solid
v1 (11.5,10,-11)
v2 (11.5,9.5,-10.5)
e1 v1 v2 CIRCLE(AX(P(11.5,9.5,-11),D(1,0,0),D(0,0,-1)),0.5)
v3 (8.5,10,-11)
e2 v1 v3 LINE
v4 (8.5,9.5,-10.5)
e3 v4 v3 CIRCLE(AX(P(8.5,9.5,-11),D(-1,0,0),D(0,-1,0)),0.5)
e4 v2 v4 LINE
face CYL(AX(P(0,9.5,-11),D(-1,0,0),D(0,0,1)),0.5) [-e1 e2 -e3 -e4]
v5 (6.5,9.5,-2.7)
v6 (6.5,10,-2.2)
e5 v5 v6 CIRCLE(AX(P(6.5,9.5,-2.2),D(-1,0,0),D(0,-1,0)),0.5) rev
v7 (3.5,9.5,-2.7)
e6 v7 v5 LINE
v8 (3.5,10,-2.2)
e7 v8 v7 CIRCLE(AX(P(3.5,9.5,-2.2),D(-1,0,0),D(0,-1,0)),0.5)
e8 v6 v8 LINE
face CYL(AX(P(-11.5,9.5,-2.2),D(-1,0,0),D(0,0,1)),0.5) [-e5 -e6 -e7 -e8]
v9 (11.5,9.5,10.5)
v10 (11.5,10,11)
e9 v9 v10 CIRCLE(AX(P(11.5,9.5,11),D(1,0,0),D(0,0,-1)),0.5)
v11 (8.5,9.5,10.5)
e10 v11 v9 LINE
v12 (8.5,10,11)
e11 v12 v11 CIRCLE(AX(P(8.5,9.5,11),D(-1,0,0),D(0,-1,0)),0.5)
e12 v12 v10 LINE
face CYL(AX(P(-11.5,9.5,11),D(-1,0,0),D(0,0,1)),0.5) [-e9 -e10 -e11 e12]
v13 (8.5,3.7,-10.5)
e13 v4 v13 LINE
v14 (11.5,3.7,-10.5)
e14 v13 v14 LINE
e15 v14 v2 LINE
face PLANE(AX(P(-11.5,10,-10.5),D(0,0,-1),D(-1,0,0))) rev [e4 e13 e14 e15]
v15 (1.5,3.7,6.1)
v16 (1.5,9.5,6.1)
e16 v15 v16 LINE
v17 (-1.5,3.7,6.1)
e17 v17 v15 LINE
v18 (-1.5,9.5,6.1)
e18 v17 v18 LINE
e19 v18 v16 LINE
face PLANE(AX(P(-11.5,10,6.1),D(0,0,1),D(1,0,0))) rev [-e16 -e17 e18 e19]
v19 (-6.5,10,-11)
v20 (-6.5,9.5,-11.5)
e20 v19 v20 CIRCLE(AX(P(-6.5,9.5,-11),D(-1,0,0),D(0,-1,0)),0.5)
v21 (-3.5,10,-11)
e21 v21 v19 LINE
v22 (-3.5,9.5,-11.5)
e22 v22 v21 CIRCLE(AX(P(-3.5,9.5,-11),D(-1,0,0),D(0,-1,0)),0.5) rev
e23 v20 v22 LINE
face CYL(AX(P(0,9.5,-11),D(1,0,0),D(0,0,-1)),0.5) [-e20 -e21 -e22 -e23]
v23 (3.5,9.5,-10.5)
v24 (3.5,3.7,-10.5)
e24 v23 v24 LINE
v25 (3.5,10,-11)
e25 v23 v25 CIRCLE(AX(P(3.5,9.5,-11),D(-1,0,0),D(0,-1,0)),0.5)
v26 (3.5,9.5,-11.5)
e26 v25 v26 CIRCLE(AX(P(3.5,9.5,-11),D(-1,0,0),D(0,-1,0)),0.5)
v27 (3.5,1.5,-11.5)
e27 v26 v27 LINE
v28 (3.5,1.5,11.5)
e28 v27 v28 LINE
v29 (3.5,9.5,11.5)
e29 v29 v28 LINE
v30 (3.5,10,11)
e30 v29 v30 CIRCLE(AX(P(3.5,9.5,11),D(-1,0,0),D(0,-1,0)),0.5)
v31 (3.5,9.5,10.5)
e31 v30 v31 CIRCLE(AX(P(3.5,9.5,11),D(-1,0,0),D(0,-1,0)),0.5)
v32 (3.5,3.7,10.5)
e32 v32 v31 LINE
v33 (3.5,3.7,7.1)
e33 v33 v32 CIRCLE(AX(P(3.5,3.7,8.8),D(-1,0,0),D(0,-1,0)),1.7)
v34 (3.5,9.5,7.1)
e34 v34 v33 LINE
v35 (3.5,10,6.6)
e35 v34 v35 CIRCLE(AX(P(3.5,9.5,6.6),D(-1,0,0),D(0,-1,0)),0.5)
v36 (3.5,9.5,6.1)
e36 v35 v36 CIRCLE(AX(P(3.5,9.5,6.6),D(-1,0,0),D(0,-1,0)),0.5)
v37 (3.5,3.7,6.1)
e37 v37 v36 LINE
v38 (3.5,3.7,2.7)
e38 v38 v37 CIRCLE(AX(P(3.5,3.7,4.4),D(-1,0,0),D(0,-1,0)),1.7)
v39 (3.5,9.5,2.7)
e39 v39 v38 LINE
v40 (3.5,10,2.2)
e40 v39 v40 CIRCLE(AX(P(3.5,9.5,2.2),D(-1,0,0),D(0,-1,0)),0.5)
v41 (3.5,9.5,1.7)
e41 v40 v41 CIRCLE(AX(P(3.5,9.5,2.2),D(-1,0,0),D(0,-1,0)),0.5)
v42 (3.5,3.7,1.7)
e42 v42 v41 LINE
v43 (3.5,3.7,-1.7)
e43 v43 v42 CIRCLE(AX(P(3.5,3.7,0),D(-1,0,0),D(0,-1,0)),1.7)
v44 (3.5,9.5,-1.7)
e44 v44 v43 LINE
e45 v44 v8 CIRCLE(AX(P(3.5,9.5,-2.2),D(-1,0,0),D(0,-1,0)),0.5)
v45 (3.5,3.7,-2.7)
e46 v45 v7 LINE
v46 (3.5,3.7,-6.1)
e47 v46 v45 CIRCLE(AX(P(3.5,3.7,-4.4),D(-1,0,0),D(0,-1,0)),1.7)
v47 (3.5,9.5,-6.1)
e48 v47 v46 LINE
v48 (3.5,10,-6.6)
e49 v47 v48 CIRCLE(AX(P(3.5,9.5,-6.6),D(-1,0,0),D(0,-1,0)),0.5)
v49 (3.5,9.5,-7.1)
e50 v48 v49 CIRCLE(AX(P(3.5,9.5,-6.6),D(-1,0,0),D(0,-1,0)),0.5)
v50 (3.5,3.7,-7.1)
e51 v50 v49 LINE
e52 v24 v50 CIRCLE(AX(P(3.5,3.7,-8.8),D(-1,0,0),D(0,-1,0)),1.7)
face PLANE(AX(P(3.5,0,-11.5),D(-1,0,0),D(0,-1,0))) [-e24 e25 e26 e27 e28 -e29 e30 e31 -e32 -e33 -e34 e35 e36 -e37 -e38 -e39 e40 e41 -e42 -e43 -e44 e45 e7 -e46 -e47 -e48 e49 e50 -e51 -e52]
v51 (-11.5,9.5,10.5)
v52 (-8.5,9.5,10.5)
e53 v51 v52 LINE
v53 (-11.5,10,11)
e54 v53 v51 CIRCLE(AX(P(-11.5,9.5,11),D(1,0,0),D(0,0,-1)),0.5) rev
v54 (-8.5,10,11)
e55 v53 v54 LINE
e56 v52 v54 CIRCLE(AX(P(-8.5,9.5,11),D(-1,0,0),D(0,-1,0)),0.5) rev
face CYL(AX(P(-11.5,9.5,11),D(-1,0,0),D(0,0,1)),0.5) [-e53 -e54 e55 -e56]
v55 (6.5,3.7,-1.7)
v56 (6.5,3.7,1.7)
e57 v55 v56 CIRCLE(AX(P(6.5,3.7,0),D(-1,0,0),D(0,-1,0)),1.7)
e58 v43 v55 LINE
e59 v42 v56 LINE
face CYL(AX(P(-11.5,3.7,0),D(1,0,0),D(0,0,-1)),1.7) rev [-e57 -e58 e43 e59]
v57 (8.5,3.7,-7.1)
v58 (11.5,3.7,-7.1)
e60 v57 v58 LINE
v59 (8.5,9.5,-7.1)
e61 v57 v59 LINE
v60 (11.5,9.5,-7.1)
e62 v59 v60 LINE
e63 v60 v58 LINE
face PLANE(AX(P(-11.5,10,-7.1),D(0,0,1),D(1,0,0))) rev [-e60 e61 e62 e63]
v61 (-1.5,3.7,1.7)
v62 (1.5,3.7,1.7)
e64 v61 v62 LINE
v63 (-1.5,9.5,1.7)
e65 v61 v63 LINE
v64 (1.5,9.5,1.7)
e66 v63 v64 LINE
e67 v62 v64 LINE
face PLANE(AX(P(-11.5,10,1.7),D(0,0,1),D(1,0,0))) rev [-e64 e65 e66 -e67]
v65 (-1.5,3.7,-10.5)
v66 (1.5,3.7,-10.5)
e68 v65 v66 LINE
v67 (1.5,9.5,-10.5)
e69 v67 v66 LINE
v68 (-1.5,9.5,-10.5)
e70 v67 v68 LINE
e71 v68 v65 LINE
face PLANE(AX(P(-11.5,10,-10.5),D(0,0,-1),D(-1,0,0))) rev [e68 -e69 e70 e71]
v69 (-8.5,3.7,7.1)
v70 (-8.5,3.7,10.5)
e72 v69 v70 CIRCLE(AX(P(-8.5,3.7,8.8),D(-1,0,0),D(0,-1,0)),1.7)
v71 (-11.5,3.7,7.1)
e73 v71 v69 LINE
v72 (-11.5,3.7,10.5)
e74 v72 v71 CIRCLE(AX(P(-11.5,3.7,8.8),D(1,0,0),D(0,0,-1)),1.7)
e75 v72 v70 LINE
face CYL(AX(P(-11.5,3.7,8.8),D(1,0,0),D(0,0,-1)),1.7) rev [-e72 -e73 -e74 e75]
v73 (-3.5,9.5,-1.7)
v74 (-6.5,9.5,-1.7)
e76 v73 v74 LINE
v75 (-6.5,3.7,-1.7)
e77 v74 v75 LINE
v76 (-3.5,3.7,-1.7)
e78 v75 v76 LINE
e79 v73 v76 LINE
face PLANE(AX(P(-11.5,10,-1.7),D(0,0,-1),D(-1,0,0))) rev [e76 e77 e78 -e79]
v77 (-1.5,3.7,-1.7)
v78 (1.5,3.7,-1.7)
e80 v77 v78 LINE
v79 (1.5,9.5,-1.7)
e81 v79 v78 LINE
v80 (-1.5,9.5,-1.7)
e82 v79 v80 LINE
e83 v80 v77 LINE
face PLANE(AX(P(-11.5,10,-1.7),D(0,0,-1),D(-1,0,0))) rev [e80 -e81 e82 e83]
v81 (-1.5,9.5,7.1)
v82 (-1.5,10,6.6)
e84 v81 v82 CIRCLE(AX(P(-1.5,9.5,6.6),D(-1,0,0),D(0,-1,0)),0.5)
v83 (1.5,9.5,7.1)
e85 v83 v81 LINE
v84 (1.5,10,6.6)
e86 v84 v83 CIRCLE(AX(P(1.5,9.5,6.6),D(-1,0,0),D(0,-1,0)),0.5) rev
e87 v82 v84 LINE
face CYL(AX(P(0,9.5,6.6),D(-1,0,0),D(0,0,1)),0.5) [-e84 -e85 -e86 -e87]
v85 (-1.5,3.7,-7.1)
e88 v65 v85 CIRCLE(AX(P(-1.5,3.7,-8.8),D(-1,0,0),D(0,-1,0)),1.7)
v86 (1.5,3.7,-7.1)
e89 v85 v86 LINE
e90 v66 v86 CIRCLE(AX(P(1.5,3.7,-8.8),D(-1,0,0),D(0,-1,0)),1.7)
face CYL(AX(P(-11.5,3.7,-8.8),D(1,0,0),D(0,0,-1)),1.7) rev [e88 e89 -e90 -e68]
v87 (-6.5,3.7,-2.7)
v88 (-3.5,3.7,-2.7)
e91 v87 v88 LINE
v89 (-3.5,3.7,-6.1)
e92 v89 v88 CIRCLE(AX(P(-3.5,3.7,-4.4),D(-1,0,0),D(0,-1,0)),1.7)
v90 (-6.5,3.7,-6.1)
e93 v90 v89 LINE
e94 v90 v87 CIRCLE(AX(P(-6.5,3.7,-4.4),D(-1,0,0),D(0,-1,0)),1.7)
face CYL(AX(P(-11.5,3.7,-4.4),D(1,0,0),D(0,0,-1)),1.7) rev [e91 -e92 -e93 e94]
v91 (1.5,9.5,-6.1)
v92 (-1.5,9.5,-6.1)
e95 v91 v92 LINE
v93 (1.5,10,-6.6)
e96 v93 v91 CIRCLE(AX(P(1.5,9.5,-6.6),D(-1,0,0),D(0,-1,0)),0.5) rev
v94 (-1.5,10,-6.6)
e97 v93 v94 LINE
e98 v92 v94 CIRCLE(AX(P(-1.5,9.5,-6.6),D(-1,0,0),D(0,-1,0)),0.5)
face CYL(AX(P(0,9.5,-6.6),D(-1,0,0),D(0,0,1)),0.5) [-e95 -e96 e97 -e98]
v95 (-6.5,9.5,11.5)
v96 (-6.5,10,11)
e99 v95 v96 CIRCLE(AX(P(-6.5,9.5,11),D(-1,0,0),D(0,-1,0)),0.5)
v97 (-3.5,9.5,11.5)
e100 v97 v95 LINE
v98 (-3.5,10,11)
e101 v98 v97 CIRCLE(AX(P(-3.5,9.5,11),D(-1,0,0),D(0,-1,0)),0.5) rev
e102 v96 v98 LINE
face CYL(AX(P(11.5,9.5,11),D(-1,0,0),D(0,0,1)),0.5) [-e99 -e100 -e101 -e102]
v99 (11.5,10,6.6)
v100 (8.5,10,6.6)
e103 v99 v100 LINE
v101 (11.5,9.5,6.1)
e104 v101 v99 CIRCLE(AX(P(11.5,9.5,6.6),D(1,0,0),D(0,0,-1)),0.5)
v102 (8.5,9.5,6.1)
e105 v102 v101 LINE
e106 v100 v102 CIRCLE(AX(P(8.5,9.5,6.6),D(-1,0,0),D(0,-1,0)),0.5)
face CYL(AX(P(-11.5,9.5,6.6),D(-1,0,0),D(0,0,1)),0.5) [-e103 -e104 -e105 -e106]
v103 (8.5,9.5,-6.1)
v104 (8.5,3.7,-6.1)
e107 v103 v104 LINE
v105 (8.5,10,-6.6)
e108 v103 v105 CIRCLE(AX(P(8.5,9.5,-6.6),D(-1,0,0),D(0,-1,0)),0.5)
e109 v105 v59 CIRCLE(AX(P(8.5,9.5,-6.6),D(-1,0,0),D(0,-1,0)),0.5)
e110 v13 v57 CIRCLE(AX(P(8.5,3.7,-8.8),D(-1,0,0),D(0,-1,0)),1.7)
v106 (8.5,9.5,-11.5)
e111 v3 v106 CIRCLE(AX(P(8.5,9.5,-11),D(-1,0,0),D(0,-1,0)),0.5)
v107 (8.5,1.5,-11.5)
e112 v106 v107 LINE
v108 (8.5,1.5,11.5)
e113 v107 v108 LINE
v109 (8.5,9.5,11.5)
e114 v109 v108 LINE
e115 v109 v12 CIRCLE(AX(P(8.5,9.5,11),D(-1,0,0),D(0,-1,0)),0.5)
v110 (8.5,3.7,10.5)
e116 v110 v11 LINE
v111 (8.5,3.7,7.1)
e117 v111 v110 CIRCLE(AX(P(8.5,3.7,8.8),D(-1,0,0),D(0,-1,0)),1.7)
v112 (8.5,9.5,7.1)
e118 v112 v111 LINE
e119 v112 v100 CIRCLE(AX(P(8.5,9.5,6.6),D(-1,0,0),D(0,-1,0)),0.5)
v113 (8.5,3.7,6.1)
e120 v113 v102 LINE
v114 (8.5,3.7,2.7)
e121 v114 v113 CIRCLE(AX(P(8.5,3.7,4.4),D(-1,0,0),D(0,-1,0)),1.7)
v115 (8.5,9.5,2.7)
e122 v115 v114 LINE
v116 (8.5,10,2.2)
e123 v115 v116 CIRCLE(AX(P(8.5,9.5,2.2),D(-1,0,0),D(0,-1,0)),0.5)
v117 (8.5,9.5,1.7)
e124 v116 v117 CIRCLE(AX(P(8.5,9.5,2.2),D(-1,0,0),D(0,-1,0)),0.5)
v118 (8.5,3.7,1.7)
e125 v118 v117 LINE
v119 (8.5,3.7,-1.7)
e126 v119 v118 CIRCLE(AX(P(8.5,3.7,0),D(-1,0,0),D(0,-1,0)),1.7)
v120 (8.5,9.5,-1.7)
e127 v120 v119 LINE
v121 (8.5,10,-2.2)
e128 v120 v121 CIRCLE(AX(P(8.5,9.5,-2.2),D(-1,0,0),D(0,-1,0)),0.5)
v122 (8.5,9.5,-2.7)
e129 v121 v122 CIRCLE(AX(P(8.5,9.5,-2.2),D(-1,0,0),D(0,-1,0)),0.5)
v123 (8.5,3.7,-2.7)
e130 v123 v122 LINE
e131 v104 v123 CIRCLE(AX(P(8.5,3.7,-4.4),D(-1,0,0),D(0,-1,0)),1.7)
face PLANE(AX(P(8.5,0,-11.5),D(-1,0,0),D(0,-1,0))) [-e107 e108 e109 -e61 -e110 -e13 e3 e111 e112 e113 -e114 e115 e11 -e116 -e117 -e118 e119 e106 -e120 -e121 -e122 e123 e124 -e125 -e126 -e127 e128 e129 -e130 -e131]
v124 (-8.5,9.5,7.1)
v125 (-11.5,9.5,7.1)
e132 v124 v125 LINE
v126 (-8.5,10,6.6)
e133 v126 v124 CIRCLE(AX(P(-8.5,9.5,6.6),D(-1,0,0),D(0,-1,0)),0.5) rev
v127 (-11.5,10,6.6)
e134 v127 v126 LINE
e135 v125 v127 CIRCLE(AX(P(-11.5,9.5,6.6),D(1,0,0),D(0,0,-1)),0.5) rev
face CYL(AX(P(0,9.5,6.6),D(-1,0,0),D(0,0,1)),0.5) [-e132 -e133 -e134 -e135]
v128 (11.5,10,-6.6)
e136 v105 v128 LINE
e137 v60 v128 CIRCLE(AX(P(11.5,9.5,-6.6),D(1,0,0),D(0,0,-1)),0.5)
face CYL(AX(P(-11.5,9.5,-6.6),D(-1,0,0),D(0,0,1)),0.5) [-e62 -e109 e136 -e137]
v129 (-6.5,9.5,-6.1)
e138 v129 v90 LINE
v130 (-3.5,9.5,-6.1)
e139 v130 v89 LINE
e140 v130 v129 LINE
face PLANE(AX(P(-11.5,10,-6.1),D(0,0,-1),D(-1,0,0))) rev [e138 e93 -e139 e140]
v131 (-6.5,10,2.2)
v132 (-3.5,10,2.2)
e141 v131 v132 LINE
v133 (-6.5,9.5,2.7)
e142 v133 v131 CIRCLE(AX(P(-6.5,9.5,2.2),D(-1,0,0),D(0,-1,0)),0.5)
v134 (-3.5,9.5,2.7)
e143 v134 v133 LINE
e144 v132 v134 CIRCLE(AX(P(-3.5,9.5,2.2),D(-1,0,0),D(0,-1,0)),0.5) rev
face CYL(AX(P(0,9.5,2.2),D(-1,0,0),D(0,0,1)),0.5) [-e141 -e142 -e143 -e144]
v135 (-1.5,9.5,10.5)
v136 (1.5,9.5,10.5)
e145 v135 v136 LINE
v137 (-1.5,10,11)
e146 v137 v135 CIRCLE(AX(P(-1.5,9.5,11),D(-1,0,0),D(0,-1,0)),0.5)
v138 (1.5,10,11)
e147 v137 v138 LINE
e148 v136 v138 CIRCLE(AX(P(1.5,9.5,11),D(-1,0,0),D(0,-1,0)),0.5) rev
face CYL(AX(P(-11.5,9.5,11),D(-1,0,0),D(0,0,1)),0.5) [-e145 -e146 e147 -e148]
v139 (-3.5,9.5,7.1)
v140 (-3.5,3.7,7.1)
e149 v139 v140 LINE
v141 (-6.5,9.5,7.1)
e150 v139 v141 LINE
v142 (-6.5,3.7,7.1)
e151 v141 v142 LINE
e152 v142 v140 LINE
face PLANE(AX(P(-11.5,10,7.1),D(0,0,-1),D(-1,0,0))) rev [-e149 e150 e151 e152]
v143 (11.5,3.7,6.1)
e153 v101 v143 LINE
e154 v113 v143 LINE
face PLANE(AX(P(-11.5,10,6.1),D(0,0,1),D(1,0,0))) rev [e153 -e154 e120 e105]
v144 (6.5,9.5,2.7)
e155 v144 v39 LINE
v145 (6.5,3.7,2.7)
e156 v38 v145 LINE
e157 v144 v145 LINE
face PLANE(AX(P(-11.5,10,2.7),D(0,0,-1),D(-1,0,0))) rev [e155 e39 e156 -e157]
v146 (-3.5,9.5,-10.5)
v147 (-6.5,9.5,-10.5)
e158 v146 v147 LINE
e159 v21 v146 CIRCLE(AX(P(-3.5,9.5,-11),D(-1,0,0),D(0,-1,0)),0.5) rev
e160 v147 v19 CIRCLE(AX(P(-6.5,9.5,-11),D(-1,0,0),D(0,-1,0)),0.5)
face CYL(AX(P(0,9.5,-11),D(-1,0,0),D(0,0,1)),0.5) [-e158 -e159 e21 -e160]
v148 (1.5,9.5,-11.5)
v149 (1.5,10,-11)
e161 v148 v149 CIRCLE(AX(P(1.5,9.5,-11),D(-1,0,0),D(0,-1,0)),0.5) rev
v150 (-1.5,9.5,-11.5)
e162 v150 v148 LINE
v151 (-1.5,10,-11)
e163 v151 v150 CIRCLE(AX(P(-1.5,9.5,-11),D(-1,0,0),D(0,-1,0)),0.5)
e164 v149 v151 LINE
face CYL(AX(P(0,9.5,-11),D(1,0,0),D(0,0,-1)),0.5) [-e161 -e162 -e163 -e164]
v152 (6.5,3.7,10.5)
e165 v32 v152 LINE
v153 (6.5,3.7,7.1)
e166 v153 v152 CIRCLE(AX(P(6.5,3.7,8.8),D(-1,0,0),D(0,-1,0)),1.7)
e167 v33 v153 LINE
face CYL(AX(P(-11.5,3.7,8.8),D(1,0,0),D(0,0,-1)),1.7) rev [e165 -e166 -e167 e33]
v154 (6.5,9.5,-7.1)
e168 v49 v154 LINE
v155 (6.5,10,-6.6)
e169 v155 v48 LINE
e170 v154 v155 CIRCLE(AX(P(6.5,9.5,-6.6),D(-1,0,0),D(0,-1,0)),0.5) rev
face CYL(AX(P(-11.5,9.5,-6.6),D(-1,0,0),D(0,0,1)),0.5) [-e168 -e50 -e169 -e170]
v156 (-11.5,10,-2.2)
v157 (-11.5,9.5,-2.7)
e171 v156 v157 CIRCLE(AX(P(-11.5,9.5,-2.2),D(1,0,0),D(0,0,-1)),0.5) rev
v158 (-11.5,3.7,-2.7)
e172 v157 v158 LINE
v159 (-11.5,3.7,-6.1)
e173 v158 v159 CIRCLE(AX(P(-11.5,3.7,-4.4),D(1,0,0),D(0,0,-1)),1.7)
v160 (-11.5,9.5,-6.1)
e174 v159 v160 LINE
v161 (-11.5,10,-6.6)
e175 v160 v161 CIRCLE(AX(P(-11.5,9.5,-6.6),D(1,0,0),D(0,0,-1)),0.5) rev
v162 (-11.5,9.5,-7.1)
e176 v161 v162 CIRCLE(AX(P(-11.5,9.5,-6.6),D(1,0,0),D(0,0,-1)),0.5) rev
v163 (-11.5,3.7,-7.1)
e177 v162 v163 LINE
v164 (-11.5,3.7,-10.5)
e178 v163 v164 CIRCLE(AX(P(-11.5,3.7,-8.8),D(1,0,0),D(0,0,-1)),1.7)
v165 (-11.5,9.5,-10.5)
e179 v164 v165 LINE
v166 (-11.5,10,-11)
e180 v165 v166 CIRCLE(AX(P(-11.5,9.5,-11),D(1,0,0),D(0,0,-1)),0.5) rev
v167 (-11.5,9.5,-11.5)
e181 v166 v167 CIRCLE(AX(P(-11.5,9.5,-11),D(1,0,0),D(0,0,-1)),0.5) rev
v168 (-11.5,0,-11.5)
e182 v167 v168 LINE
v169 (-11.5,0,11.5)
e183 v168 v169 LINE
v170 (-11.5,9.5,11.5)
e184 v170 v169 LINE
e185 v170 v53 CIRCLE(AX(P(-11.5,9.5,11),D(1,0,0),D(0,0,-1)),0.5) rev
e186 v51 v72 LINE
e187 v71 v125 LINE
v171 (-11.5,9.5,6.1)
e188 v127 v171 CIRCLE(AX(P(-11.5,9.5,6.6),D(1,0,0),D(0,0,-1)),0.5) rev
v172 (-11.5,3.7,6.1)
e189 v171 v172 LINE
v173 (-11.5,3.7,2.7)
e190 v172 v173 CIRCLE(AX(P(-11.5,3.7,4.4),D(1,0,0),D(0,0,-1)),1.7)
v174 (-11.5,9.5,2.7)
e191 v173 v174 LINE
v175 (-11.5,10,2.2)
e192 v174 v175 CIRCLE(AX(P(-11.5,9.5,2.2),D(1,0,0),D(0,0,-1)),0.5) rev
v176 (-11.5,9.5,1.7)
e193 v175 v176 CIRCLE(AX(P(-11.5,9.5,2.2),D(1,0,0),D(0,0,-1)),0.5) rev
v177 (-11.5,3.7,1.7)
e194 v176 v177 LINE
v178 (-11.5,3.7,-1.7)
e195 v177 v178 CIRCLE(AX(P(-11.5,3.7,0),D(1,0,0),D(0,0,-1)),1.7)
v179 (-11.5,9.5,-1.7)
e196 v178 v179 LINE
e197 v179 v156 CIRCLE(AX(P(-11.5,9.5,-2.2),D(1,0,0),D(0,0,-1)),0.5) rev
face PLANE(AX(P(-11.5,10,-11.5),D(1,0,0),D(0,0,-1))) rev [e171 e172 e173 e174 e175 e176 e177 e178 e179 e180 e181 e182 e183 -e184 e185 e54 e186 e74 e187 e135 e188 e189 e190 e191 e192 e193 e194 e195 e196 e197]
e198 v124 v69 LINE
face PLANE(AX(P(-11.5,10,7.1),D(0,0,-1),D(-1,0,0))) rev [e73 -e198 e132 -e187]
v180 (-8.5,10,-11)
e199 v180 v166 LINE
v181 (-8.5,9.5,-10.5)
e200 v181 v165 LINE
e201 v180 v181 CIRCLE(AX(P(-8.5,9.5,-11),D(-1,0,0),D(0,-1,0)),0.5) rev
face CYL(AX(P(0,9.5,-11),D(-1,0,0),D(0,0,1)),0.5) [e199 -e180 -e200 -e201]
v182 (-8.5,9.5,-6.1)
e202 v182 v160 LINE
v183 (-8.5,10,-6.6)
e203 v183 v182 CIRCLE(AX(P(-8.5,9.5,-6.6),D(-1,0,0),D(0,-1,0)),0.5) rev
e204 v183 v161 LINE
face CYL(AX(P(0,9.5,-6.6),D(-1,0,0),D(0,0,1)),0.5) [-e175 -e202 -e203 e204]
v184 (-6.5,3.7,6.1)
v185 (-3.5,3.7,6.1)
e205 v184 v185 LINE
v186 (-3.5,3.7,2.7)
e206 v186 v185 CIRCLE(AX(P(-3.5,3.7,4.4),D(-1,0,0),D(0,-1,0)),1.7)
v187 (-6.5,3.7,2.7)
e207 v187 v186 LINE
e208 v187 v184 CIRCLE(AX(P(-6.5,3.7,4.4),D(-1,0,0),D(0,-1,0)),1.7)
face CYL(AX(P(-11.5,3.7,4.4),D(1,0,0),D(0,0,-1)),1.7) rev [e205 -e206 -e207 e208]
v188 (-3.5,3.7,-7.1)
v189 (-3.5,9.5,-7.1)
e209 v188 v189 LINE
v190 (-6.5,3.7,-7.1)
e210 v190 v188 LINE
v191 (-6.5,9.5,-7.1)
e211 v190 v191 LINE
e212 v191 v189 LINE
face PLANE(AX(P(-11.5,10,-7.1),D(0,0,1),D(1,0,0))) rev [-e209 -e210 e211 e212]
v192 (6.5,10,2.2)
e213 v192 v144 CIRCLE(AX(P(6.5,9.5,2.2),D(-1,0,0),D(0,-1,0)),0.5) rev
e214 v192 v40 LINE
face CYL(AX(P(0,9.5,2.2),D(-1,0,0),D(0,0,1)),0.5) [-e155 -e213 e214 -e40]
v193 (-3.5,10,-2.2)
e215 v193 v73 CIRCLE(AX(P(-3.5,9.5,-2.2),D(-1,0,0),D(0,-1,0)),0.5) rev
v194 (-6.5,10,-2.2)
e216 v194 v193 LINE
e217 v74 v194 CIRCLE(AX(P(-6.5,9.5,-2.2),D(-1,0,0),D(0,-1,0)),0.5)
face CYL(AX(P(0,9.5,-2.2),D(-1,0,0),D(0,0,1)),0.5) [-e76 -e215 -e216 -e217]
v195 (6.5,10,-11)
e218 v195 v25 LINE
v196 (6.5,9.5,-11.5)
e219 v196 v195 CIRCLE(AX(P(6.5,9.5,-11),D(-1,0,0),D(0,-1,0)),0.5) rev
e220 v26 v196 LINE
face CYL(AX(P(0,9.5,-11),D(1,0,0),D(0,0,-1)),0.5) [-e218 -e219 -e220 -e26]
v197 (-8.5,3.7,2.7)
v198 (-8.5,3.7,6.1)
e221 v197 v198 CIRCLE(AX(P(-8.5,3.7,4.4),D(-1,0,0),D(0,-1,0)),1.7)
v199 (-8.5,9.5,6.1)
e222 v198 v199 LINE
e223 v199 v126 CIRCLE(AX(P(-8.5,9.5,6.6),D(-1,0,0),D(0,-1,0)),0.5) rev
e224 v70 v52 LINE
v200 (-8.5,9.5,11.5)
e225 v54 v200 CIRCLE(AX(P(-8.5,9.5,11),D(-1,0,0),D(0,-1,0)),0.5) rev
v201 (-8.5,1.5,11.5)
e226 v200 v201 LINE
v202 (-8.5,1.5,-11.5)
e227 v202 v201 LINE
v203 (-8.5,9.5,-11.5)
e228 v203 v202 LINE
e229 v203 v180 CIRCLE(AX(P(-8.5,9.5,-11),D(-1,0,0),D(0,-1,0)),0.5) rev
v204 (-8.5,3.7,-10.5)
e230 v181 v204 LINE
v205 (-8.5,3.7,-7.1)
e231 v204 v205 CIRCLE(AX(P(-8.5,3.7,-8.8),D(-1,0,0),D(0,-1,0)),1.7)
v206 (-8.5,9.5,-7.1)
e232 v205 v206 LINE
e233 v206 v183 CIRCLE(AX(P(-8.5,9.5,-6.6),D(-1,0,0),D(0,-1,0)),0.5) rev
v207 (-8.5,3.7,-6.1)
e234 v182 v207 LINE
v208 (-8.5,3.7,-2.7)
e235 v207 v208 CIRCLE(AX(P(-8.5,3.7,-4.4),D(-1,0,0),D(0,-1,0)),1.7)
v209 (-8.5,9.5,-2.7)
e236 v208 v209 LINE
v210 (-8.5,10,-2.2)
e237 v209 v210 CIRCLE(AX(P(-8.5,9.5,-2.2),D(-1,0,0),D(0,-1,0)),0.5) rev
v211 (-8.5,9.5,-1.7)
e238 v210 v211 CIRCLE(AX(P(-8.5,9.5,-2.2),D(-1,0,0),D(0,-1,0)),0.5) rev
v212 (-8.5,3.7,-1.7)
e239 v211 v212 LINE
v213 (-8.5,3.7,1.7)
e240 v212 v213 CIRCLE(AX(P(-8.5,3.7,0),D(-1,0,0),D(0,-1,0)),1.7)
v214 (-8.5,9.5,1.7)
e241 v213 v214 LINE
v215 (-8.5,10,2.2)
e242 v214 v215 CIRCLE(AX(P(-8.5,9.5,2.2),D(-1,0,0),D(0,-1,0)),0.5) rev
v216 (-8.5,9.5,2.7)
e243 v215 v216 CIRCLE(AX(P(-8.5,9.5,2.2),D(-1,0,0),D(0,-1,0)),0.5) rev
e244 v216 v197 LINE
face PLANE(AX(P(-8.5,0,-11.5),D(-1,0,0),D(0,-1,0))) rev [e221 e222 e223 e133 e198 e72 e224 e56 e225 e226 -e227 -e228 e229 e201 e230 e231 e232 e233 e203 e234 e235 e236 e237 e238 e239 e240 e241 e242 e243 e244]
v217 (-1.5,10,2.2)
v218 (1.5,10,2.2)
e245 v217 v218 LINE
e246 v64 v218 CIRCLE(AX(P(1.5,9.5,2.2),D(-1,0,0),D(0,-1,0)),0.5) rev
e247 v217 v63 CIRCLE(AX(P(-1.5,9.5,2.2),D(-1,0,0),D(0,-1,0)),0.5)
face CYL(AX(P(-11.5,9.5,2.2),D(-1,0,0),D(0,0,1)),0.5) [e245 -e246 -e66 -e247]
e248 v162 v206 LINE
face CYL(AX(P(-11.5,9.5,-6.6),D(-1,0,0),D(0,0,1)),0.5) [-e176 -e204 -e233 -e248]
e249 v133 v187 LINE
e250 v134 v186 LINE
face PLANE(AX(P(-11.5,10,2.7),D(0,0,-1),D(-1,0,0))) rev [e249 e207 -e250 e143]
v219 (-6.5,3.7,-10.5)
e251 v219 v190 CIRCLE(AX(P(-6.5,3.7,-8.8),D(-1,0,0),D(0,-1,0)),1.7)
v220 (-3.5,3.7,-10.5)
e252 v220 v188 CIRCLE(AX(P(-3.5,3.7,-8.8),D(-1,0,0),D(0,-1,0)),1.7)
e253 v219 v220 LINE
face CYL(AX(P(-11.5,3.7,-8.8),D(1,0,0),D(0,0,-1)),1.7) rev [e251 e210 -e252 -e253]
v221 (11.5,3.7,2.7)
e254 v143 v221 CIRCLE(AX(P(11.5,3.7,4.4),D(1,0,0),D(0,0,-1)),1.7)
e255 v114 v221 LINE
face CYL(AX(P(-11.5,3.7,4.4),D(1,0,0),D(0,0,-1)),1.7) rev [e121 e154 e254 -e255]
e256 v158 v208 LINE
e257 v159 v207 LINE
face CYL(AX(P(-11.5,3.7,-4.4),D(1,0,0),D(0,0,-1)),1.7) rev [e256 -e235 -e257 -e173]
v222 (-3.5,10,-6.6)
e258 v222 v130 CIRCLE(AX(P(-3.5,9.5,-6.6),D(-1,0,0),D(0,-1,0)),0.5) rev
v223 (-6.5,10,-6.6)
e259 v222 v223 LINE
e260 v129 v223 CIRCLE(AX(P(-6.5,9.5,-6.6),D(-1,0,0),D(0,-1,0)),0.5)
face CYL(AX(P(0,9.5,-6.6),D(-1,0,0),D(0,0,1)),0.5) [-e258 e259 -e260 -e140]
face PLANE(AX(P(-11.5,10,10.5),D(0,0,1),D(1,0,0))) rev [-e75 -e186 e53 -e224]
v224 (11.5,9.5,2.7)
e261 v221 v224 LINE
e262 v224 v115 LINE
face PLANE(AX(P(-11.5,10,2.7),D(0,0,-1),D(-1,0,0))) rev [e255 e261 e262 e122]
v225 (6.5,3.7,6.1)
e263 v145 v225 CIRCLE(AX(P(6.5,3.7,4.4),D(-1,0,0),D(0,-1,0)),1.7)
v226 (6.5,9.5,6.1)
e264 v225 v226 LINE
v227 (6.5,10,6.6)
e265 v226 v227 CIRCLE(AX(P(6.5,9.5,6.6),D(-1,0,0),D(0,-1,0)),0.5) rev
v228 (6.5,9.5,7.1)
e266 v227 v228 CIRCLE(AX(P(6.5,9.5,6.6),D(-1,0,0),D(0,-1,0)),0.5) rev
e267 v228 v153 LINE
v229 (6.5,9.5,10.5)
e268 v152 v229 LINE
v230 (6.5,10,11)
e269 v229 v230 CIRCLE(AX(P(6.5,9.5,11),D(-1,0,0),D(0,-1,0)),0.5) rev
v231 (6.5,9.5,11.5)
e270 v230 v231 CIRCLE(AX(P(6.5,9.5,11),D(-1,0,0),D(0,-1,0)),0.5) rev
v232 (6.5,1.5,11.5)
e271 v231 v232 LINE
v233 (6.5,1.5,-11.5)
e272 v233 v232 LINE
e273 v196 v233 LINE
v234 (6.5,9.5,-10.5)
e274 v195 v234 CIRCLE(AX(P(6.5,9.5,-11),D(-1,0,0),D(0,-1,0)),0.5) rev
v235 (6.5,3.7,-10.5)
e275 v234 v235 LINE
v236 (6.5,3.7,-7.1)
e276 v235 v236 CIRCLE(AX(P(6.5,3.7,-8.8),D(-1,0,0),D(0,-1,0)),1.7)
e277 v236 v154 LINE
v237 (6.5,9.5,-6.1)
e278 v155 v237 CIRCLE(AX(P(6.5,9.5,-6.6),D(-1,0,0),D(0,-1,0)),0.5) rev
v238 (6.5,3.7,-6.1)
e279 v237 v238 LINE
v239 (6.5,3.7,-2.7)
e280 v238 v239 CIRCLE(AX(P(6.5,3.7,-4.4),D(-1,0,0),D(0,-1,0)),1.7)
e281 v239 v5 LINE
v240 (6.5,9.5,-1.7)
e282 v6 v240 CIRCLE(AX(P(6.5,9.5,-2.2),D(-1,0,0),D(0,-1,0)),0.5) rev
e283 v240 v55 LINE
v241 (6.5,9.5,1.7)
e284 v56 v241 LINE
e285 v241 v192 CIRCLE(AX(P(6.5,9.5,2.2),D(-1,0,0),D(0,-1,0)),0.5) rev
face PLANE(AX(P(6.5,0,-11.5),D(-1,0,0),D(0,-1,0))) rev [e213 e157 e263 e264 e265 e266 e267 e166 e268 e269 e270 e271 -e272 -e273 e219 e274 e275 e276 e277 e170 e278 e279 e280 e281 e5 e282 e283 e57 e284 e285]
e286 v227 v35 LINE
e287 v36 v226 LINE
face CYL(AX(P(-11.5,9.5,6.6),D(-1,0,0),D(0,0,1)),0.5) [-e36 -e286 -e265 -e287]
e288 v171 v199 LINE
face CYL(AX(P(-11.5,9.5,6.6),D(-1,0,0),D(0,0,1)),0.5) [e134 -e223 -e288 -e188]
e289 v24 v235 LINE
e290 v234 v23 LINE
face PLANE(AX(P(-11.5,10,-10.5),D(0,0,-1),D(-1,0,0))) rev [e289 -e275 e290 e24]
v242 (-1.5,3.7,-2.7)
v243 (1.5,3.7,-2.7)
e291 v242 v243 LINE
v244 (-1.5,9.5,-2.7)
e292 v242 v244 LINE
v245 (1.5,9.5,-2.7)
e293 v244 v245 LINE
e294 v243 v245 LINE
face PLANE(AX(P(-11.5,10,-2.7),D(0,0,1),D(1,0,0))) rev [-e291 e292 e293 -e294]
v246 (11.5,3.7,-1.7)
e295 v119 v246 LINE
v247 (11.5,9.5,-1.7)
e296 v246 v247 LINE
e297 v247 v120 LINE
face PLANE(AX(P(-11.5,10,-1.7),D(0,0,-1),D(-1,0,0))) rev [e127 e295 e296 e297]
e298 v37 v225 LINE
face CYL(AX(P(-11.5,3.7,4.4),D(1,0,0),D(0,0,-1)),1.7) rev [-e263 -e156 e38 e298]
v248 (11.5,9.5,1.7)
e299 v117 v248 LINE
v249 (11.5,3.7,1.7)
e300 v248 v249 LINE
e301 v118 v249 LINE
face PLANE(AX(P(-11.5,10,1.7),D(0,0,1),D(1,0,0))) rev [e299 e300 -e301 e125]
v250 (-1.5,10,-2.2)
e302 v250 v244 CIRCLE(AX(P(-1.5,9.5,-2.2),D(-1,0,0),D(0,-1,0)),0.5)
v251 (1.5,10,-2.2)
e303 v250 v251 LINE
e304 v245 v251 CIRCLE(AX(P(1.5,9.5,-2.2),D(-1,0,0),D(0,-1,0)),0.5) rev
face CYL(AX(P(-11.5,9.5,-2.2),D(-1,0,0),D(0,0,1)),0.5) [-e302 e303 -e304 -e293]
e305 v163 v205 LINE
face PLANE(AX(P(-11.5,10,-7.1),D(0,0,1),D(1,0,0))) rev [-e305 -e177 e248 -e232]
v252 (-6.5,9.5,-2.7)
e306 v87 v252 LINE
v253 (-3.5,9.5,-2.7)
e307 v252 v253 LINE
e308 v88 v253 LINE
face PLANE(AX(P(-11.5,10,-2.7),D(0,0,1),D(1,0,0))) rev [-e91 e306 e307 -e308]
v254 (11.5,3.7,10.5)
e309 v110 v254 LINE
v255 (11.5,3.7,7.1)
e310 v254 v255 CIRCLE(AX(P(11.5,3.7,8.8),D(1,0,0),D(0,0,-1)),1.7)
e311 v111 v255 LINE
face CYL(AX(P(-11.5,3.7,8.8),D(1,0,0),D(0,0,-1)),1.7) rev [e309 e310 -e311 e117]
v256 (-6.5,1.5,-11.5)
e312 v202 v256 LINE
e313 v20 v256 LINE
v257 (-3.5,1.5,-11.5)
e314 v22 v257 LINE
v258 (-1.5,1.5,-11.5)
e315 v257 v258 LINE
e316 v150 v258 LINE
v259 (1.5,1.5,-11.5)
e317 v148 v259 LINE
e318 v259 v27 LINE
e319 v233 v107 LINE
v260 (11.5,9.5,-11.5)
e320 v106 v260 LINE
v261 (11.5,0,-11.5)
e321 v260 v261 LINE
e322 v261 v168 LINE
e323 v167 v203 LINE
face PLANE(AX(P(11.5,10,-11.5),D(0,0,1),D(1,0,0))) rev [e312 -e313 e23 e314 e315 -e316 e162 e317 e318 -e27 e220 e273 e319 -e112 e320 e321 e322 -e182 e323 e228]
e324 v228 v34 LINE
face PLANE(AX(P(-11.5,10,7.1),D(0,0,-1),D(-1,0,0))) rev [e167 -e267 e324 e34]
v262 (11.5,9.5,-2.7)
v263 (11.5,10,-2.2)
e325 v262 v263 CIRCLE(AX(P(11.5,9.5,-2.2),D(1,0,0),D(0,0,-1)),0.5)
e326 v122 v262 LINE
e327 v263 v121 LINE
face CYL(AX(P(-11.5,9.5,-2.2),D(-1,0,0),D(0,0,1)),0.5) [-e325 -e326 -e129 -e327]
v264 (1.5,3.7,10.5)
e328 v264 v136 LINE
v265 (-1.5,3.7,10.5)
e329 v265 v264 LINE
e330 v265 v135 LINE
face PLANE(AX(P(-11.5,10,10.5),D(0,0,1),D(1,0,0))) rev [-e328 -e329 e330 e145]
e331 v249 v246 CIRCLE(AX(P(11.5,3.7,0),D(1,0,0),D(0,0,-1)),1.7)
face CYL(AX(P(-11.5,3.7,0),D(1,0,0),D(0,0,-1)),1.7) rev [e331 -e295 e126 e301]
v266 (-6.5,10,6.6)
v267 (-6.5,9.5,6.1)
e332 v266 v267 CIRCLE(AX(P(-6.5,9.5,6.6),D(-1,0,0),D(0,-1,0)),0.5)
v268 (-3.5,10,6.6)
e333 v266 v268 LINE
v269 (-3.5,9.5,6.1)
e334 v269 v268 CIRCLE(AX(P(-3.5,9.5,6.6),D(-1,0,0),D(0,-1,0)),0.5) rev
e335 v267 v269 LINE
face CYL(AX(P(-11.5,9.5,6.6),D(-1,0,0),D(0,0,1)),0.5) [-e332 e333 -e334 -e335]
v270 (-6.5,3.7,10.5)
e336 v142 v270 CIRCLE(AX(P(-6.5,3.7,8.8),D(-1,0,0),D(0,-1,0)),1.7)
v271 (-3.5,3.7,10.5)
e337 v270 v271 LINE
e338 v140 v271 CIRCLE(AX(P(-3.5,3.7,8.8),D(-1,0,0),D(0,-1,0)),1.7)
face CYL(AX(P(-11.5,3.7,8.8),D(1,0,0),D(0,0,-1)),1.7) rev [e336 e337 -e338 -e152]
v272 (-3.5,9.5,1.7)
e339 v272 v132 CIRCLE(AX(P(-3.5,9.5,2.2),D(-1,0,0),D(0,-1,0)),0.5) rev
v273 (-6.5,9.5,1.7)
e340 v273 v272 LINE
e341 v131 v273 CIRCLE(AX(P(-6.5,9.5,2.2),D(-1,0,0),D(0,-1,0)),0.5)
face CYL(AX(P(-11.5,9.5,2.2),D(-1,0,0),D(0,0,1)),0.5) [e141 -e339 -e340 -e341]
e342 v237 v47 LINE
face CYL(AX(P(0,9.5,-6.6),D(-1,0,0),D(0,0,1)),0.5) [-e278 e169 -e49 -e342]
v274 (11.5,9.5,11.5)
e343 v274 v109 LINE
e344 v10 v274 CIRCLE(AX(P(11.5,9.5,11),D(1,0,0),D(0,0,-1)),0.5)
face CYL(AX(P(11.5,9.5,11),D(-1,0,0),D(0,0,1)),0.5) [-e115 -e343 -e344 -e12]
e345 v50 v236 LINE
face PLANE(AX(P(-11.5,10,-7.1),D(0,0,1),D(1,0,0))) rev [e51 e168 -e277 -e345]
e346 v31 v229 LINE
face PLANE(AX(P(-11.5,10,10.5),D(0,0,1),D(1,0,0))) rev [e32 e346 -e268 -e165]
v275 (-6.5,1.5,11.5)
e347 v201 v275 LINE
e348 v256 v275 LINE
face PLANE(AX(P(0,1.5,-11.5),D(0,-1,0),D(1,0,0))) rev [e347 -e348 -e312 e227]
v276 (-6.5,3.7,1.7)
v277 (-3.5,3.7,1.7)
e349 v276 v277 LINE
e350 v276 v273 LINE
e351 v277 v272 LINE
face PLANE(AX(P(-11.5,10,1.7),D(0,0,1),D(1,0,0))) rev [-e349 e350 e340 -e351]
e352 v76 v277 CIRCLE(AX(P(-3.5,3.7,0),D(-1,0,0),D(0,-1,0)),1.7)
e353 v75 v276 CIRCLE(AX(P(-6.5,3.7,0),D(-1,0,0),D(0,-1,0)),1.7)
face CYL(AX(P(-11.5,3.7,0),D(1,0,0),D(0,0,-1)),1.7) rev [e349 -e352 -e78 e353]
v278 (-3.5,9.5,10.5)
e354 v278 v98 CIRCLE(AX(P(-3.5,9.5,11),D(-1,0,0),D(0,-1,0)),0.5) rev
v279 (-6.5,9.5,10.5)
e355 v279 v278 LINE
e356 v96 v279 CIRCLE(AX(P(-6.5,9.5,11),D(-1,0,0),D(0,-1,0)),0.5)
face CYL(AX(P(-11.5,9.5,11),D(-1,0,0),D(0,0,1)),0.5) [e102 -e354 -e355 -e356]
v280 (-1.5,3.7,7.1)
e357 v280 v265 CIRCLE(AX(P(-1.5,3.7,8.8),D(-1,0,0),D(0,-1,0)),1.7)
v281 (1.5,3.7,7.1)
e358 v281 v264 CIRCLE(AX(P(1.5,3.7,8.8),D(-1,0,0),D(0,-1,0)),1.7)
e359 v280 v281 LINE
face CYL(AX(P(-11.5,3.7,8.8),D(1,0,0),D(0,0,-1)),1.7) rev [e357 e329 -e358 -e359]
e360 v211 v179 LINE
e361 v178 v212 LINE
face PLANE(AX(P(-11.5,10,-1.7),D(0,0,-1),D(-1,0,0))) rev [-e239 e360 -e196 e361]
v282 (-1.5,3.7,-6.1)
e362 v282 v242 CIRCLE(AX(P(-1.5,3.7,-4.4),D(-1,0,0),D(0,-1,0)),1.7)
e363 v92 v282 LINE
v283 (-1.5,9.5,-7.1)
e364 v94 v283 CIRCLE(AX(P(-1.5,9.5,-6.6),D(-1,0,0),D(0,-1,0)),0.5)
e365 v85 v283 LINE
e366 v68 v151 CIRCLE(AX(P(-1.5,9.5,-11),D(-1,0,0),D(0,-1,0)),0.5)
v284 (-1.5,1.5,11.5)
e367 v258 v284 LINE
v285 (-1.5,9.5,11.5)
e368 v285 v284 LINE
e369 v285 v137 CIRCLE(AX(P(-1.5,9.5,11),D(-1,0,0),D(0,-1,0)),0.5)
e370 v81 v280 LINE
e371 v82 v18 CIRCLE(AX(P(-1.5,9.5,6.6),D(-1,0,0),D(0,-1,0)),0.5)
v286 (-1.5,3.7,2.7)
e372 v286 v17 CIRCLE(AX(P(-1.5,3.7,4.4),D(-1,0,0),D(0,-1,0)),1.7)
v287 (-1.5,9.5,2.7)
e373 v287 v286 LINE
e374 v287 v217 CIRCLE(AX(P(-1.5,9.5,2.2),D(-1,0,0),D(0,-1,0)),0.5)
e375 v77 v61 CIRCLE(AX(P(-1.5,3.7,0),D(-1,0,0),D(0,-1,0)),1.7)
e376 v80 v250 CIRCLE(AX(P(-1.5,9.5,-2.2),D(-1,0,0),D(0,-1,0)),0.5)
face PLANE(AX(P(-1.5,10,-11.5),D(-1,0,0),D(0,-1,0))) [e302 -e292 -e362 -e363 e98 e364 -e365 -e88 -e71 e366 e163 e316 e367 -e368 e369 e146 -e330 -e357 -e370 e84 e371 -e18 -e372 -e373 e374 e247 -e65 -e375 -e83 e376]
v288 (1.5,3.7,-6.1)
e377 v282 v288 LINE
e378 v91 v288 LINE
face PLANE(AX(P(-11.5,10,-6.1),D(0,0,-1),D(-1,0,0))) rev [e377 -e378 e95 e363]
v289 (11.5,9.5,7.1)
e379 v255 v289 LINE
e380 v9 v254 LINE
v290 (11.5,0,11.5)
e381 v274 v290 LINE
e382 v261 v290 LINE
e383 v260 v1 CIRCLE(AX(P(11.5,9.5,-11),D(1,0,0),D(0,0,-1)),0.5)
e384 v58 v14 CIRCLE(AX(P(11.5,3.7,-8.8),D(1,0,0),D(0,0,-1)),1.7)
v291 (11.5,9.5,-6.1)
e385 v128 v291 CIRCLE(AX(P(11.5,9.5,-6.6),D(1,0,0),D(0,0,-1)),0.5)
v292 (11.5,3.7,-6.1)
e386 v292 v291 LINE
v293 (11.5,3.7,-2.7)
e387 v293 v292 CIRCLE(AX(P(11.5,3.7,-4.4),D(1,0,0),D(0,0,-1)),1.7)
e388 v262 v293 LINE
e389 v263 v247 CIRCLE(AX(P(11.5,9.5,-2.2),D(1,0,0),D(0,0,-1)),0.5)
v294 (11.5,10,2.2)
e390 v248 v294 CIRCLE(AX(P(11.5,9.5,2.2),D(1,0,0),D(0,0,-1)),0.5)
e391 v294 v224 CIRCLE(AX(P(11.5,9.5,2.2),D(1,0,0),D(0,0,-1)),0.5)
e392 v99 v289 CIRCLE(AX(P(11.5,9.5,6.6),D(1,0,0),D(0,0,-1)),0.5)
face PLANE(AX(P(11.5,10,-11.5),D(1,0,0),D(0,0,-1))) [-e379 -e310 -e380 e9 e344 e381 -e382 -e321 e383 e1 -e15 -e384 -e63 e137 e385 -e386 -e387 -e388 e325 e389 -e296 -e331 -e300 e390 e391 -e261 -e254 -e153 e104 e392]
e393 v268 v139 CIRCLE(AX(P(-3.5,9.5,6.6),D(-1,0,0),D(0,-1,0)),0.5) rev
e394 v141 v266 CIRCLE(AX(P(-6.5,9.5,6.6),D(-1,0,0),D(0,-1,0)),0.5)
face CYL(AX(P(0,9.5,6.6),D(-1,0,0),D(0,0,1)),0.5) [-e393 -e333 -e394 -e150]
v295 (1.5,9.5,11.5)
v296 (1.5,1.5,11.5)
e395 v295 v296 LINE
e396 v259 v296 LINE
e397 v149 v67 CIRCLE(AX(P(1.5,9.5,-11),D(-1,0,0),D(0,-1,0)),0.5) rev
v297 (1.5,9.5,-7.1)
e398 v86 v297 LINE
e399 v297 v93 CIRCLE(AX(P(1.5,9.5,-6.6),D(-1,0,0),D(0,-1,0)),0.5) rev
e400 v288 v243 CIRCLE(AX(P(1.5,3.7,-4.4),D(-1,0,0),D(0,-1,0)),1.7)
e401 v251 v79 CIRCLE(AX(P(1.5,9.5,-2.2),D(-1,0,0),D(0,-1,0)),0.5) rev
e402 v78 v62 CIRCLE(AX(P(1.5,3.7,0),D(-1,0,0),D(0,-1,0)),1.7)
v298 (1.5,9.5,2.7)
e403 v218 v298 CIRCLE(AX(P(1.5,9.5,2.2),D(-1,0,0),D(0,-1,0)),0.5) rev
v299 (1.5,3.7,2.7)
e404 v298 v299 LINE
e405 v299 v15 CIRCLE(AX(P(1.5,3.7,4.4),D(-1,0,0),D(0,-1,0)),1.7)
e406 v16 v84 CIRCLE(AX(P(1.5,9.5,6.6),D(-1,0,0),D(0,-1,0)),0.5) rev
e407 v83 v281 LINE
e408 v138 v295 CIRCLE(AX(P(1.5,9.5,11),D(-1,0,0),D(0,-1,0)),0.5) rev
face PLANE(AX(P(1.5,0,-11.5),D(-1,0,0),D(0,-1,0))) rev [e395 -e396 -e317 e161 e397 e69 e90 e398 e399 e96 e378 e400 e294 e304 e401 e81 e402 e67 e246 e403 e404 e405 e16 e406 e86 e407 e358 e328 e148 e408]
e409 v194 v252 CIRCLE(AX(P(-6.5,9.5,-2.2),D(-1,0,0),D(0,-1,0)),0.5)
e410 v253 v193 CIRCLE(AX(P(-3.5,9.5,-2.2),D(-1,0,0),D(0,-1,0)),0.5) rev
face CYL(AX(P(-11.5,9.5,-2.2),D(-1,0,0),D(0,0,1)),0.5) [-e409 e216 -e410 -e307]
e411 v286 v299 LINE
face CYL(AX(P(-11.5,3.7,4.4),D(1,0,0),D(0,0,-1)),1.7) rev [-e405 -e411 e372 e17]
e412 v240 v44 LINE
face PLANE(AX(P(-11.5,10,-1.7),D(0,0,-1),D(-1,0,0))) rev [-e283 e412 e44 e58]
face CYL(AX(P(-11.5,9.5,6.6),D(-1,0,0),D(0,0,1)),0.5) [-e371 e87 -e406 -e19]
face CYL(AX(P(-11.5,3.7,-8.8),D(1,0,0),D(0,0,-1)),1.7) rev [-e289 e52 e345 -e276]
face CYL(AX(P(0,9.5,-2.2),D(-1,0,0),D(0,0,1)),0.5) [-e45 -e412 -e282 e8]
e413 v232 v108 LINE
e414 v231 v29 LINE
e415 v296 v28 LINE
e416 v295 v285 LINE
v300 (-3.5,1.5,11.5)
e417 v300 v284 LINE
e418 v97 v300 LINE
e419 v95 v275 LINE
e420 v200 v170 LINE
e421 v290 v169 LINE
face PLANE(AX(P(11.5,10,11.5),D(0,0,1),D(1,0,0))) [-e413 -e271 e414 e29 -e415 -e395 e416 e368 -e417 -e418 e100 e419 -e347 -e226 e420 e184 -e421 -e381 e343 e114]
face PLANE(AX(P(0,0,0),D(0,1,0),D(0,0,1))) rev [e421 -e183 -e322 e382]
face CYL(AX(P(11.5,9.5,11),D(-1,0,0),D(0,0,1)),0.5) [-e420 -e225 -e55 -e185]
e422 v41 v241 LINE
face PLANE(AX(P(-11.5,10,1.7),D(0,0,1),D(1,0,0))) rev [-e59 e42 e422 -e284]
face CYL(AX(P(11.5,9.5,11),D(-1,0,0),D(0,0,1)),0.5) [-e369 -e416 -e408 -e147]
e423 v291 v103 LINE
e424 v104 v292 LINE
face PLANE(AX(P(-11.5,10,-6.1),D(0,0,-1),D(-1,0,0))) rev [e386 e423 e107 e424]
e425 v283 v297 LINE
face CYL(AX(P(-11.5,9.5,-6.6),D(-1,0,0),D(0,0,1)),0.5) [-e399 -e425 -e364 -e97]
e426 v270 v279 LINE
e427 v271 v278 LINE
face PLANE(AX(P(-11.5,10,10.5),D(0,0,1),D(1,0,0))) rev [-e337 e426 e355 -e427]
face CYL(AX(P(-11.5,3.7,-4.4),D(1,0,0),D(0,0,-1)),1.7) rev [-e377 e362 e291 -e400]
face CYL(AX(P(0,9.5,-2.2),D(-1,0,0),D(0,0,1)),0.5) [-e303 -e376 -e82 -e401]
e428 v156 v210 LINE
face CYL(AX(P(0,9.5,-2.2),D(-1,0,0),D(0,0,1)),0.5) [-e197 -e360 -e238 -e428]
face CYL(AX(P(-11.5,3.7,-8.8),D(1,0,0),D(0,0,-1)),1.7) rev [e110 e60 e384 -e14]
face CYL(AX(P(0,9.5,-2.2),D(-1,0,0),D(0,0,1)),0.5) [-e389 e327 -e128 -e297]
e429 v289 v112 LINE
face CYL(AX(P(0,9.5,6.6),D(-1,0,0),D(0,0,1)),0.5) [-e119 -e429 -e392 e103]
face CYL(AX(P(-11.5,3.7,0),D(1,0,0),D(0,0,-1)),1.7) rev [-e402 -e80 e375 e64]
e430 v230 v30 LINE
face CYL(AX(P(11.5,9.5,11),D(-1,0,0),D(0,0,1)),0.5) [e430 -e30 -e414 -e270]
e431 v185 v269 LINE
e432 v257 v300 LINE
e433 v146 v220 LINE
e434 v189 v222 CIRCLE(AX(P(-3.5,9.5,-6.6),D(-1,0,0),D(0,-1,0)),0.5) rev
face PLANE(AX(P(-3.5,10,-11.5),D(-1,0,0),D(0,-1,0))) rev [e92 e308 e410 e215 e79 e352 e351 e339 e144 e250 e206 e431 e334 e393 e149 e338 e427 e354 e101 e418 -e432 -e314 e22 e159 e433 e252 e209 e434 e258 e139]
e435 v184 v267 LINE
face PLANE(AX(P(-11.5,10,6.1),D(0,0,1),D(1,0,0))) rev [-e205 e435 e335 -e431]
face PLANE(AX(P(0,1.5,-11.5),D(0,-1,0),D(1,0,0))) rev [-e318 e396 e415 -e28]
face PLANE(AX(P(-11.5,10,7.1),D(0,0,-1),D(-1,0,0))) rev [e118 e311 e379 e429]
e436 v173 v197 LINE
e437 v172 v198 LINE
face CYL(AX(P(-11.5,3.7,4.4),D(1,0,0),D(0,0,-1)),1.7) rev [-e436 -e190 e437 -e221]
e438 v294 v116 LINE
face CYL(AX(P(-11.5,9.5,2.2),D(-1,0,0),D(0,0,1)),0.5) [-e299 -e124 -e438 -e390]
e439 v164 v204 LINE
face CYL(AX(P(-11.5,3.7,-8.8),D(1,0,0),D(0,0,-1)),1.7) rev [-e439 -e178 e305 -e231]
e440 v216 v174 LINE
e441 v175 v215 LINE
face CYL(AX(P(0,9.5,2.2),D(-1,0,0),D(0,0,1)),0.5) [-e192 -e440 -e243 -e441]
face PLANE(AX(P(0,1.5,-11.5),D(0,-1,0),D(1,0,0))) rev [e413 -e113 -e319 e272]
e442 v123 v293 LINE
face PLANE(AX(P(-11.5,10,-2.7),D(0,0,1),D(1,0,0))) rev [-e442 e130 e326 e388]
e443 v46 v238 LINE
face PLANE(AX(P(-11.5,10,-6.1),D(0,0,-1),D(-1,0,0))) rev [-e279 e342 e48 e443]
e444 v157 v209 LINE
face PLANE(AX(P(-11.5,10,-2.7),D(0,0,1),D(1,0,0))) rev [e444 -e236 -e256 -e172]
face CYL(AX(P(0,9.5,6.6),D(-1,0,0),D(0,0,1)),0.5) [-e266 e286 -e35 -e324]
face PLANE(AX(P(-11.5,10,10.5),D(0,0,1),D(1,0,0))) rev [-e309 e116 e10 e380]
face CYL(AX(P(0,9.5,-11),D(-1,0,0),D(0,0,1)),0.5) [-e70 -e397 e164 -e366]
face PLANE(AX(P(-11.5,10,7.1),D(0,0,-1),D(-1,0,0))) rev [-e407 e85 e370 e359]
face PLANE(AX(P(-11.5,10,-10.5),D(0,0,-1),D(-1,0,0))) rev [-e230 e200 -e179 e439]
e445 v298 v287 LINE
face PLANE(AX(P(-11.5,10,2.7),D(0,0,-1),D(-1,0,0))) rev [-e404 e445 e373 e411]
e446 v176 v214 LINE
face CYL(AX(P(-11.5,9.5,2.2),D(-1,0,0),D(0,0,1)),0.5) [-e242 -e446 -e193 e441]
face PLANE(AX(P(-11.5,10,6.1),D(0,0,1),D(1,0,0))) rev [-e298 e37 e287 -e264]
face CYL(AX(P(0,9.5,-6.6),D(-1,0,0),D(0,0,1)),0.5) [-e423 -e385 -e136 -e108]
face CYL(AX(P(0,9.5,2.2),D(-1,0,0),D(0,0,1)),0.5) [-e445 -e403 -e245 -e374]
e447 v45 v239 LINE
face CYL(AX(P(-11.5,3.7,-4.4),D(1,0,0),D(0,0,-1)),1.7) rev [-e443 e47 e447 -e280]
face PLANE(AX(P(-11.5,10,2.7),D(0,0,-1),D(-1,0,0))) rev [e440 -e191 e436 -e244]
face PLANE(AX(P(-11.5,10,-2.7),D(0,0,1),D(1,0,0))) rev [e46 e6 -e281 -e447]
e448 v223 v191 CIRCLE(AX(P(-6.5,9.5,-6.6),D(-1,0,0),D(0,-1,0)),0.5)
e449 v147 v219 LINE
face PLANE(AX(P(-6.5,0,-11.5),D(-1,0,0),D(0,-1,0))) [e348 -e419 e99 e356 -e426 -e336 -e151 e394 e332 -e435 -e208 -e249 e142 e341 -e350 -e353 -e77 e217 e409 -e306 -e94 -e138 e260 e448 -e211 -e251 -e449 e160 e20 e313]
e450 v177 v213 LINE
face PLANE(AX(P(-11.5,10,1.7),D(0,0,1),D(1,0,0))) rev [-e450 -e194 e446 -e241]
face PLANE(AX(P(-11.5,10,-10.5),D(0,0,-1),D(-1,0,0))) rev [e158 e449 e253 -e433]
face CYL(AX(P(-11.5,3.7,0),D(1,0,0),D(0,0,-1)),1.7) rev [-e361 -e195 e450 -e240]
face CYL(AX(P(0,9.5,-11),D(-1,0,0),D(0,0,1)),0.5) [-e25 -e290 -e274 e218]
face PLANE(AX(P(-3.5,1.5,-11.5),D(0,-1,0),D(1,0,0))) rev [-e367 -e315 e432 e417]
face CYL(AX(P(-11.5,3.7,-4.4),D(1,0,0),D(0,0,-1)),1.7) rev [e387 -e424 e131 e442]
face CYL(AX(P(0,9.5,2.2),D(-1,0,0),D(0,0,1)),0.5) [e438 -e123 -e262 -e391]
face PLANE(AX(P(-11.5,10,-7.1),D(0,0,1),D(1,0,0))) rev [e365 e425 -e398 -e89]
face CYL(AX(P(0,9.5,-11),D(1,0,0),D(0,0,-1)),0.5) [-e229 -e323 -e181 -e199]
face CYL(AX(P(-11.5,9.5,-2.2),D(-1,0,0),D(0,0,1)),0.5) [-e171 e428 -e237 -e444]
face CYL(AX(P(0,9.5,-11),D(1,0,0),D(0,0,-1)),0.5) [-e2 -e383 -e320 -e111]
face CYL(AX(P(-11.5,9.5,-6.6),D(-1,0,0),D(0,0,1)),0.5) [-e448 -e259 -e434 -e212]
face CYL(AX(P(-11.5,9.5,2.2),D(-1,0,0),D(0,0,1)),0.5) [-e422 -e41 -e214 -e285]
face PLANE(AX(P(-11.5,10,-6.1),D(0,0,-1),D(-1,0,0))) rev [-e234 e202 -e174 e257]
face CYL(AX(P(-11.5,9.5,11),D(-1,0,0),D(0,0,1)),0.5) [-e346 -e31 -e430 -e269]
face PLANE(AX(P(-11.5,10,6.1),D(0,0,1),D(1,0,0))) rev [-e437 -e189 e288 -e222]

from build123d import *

# Parameters (mm, degrees)
CROQUIS1_W              = 23
CROQUIS1_H              = 23
SALIENTE_EXTRUIR4_DEPTH = 10
CROQUIS2_W              = 2
CROQUIS2_H              = 8.5
CORTAR_EXTRUIR2_DEPTH   = 28.590759323
CORTAR_EXTRUIR6_DEPTH   = 28.590759323
REDONDEO14_R            = 0.5
REDONDEO15_R            = 0.5


with BuildPart() as part:
    # Croquis1 → Saliente-Extruir4 (new body)
    with BuildSketch(Plane(origin=(0, 0, 0), x_dir=(1, 0, 0), z_dir=(0, 1, 0))):
        Rectangle(CROQUIS1_W, CROQUIS1_H)
    extrude(amount=SALIENTE_EXTRUIR4_DEPTH)

    # Croquis2 → Cortar-Extruir2 (cut, through all)
    with BuildSketch(Plane.XY.offset(11.5)):
        with Locations((-7.5, 5.75)):
            Rectangle(CROQUIS2_W, CROQUIS2_H)
        with Locations((-2.5, 5.75)):
            Rectangle(CROQUIS2_W, CROQUIS2_H)
        with Locations((2.5, 5.75)):
            Rectangle(CROQUIS2_W, CROQUIS2_H)
        with Locations((7.5, 5.75)):
            Rectangle(CROQUIS2_W, CROQUIS2_H)
    extrude(amount=-CORTAR_EXTRUIR2_DEPTH, mode=Mode.SUBTRACT)

    # Croquis3 → Cortar-Extruir6 (cut, through all)
    with BuildSketch(Plane(origin=(11.5, 0, 0), x_dir=(0, 0, -1), z_dir=(1, 0, 0))):
        with BuildLine():
            Line((-10.5, 10), (-7.1, 10))
            Line((-7.1, 10), (-7.1, 3.7))
            ThreePointArc((-7.1, 3.7), (-8.8, 2), (-10.5, 3.7))
            Line((-10.5, 3.7), (-10.5, 10))
        make_face()
        with BuildLine():
            Line((-6.1, 10), (-6.1, 3.7))
            ThreePointArc((-6.1, 3.7), (-4.4, 2), (-2.7, 3.7))
            Line((-2.7, 3.7), (-2.7, 10))
            Line((-2.7, 10), (-6.1, 10))
        make_face()
        with BuildLine():
            Line((-1.7, 10), (-1.7, 3.7))
            ThreePointArc((-1.7, 3.7), (0, 2), (1.7, 3.7))
            Line((1.7, 3.7), (1.7, 10))
            Line((1.7, 10), (-1.7, 10))
        make_face()
        with BuildLine():
            Line((2.7, 10), (2.7, 3.7))
            ThreePointArc((2.7, 3.7), (4.4, 2), (6.1, 3.7))
            Line((6.1, 3.7), (6.1, 10))
            Line((6.1, 10), (2.7, 10))
        make_face()
        with BuildLine():
            Line((7.1, 10), (7.1, 3.7))
            ThreePointArc((7.1, 3.7), (8.8, 2), (10.5, 3.7))
            Line((10.5, 3.7), (10.5, 10))
            Line((10.5, 10), (7.1, 10))
        make_face()
    extrude(amount=-CORTAR_EXTRUIR6_DEPTH, mode=Mode.SUBTRACT)

    # Redondeo14
    redondeo14_edges = [part.edges().sort_by_distance(p)[0] for p in [
        (-5, 10, -2.7),
        (-5, 10, -1.7),
        (-10, 10, -2.7),
        (-10, 10, -1.7),
        (-10, 10, 1.7),
        (-10, 10, 2.7),
        (-5, 10, 1.7),
        (-5, 10, 2.7),
        (-5, 10, 6.1),
        (-5, 10, 7.1),
        (-5, 10, 10.5),
        (-5, 10, 11.5),
        (-10, 10, 6.1),
        (-10, 10, 7.1),
        (-10, 10, 10.5),
        (-10, 10, 11.5),
        (0, 10, -2.7),
        (0, 10, -1.7),
        (0, 10, 1.7),
        (0, 10, 2.7),
        (0, 10, 6.1),
        (0, 10, 7.1),
        (0, 10, 10.5),
        (0, 10, 11.5),
        (5, 10, 11.5),
        (5, 10, 10.5),
        (5, 10, 7.1),
        (5, 10, 6.1),
        (5, 10, 2.7),
        (5, 10, 1.7),
        (5, 10, -1.7),
        (5, 10, -2.7),
        (5, 10, -6.1),
        (5, 10, -7.1),
        (0, 10, -6.1),
        (0, 10, -7.1),
        (-5, 10, -6.1),
        (-5, 10, -7.1),
        (-10, 10, -6.1),
        (-10, 10, -7.1),
        (-10, 10, -10.5),
        (-10, 10, -11.5),
        (-5, 10, -10.5),
        (-5, 10, -11.5),
        (0, 10, -11.5),
        (5, 10, -11.5),
        (10, 10, 10.5),
        (10, 10, 11.5),
        (10, 10, 7.1),
        (10, 10, 6.1),
        (10, 10, 2.7),
        (10, 10, 1.7),
        (10, 10, -1.7),
        (10, 10, -2.7),
        (10, 10, -7.1),
        (10, 10, -6.1),
        (10, 10, -10.5),
        (10, 10, -11.5),
    ]]
    fillet(redondeo14_edges, radius=REDONDEO14_R - 0.0001)  # a hair under: the kernel refuses the full size

    # Redondeo15
    redondeo15_edges = [part.edges().sort_by_distance(p)[0] for p in [
        (5, 10, -10.5),
        (0, 10, -10.5),
    ]]
    fillet(redondeo15_edges, radius=REDONDEO15_R)


solid = part.part
